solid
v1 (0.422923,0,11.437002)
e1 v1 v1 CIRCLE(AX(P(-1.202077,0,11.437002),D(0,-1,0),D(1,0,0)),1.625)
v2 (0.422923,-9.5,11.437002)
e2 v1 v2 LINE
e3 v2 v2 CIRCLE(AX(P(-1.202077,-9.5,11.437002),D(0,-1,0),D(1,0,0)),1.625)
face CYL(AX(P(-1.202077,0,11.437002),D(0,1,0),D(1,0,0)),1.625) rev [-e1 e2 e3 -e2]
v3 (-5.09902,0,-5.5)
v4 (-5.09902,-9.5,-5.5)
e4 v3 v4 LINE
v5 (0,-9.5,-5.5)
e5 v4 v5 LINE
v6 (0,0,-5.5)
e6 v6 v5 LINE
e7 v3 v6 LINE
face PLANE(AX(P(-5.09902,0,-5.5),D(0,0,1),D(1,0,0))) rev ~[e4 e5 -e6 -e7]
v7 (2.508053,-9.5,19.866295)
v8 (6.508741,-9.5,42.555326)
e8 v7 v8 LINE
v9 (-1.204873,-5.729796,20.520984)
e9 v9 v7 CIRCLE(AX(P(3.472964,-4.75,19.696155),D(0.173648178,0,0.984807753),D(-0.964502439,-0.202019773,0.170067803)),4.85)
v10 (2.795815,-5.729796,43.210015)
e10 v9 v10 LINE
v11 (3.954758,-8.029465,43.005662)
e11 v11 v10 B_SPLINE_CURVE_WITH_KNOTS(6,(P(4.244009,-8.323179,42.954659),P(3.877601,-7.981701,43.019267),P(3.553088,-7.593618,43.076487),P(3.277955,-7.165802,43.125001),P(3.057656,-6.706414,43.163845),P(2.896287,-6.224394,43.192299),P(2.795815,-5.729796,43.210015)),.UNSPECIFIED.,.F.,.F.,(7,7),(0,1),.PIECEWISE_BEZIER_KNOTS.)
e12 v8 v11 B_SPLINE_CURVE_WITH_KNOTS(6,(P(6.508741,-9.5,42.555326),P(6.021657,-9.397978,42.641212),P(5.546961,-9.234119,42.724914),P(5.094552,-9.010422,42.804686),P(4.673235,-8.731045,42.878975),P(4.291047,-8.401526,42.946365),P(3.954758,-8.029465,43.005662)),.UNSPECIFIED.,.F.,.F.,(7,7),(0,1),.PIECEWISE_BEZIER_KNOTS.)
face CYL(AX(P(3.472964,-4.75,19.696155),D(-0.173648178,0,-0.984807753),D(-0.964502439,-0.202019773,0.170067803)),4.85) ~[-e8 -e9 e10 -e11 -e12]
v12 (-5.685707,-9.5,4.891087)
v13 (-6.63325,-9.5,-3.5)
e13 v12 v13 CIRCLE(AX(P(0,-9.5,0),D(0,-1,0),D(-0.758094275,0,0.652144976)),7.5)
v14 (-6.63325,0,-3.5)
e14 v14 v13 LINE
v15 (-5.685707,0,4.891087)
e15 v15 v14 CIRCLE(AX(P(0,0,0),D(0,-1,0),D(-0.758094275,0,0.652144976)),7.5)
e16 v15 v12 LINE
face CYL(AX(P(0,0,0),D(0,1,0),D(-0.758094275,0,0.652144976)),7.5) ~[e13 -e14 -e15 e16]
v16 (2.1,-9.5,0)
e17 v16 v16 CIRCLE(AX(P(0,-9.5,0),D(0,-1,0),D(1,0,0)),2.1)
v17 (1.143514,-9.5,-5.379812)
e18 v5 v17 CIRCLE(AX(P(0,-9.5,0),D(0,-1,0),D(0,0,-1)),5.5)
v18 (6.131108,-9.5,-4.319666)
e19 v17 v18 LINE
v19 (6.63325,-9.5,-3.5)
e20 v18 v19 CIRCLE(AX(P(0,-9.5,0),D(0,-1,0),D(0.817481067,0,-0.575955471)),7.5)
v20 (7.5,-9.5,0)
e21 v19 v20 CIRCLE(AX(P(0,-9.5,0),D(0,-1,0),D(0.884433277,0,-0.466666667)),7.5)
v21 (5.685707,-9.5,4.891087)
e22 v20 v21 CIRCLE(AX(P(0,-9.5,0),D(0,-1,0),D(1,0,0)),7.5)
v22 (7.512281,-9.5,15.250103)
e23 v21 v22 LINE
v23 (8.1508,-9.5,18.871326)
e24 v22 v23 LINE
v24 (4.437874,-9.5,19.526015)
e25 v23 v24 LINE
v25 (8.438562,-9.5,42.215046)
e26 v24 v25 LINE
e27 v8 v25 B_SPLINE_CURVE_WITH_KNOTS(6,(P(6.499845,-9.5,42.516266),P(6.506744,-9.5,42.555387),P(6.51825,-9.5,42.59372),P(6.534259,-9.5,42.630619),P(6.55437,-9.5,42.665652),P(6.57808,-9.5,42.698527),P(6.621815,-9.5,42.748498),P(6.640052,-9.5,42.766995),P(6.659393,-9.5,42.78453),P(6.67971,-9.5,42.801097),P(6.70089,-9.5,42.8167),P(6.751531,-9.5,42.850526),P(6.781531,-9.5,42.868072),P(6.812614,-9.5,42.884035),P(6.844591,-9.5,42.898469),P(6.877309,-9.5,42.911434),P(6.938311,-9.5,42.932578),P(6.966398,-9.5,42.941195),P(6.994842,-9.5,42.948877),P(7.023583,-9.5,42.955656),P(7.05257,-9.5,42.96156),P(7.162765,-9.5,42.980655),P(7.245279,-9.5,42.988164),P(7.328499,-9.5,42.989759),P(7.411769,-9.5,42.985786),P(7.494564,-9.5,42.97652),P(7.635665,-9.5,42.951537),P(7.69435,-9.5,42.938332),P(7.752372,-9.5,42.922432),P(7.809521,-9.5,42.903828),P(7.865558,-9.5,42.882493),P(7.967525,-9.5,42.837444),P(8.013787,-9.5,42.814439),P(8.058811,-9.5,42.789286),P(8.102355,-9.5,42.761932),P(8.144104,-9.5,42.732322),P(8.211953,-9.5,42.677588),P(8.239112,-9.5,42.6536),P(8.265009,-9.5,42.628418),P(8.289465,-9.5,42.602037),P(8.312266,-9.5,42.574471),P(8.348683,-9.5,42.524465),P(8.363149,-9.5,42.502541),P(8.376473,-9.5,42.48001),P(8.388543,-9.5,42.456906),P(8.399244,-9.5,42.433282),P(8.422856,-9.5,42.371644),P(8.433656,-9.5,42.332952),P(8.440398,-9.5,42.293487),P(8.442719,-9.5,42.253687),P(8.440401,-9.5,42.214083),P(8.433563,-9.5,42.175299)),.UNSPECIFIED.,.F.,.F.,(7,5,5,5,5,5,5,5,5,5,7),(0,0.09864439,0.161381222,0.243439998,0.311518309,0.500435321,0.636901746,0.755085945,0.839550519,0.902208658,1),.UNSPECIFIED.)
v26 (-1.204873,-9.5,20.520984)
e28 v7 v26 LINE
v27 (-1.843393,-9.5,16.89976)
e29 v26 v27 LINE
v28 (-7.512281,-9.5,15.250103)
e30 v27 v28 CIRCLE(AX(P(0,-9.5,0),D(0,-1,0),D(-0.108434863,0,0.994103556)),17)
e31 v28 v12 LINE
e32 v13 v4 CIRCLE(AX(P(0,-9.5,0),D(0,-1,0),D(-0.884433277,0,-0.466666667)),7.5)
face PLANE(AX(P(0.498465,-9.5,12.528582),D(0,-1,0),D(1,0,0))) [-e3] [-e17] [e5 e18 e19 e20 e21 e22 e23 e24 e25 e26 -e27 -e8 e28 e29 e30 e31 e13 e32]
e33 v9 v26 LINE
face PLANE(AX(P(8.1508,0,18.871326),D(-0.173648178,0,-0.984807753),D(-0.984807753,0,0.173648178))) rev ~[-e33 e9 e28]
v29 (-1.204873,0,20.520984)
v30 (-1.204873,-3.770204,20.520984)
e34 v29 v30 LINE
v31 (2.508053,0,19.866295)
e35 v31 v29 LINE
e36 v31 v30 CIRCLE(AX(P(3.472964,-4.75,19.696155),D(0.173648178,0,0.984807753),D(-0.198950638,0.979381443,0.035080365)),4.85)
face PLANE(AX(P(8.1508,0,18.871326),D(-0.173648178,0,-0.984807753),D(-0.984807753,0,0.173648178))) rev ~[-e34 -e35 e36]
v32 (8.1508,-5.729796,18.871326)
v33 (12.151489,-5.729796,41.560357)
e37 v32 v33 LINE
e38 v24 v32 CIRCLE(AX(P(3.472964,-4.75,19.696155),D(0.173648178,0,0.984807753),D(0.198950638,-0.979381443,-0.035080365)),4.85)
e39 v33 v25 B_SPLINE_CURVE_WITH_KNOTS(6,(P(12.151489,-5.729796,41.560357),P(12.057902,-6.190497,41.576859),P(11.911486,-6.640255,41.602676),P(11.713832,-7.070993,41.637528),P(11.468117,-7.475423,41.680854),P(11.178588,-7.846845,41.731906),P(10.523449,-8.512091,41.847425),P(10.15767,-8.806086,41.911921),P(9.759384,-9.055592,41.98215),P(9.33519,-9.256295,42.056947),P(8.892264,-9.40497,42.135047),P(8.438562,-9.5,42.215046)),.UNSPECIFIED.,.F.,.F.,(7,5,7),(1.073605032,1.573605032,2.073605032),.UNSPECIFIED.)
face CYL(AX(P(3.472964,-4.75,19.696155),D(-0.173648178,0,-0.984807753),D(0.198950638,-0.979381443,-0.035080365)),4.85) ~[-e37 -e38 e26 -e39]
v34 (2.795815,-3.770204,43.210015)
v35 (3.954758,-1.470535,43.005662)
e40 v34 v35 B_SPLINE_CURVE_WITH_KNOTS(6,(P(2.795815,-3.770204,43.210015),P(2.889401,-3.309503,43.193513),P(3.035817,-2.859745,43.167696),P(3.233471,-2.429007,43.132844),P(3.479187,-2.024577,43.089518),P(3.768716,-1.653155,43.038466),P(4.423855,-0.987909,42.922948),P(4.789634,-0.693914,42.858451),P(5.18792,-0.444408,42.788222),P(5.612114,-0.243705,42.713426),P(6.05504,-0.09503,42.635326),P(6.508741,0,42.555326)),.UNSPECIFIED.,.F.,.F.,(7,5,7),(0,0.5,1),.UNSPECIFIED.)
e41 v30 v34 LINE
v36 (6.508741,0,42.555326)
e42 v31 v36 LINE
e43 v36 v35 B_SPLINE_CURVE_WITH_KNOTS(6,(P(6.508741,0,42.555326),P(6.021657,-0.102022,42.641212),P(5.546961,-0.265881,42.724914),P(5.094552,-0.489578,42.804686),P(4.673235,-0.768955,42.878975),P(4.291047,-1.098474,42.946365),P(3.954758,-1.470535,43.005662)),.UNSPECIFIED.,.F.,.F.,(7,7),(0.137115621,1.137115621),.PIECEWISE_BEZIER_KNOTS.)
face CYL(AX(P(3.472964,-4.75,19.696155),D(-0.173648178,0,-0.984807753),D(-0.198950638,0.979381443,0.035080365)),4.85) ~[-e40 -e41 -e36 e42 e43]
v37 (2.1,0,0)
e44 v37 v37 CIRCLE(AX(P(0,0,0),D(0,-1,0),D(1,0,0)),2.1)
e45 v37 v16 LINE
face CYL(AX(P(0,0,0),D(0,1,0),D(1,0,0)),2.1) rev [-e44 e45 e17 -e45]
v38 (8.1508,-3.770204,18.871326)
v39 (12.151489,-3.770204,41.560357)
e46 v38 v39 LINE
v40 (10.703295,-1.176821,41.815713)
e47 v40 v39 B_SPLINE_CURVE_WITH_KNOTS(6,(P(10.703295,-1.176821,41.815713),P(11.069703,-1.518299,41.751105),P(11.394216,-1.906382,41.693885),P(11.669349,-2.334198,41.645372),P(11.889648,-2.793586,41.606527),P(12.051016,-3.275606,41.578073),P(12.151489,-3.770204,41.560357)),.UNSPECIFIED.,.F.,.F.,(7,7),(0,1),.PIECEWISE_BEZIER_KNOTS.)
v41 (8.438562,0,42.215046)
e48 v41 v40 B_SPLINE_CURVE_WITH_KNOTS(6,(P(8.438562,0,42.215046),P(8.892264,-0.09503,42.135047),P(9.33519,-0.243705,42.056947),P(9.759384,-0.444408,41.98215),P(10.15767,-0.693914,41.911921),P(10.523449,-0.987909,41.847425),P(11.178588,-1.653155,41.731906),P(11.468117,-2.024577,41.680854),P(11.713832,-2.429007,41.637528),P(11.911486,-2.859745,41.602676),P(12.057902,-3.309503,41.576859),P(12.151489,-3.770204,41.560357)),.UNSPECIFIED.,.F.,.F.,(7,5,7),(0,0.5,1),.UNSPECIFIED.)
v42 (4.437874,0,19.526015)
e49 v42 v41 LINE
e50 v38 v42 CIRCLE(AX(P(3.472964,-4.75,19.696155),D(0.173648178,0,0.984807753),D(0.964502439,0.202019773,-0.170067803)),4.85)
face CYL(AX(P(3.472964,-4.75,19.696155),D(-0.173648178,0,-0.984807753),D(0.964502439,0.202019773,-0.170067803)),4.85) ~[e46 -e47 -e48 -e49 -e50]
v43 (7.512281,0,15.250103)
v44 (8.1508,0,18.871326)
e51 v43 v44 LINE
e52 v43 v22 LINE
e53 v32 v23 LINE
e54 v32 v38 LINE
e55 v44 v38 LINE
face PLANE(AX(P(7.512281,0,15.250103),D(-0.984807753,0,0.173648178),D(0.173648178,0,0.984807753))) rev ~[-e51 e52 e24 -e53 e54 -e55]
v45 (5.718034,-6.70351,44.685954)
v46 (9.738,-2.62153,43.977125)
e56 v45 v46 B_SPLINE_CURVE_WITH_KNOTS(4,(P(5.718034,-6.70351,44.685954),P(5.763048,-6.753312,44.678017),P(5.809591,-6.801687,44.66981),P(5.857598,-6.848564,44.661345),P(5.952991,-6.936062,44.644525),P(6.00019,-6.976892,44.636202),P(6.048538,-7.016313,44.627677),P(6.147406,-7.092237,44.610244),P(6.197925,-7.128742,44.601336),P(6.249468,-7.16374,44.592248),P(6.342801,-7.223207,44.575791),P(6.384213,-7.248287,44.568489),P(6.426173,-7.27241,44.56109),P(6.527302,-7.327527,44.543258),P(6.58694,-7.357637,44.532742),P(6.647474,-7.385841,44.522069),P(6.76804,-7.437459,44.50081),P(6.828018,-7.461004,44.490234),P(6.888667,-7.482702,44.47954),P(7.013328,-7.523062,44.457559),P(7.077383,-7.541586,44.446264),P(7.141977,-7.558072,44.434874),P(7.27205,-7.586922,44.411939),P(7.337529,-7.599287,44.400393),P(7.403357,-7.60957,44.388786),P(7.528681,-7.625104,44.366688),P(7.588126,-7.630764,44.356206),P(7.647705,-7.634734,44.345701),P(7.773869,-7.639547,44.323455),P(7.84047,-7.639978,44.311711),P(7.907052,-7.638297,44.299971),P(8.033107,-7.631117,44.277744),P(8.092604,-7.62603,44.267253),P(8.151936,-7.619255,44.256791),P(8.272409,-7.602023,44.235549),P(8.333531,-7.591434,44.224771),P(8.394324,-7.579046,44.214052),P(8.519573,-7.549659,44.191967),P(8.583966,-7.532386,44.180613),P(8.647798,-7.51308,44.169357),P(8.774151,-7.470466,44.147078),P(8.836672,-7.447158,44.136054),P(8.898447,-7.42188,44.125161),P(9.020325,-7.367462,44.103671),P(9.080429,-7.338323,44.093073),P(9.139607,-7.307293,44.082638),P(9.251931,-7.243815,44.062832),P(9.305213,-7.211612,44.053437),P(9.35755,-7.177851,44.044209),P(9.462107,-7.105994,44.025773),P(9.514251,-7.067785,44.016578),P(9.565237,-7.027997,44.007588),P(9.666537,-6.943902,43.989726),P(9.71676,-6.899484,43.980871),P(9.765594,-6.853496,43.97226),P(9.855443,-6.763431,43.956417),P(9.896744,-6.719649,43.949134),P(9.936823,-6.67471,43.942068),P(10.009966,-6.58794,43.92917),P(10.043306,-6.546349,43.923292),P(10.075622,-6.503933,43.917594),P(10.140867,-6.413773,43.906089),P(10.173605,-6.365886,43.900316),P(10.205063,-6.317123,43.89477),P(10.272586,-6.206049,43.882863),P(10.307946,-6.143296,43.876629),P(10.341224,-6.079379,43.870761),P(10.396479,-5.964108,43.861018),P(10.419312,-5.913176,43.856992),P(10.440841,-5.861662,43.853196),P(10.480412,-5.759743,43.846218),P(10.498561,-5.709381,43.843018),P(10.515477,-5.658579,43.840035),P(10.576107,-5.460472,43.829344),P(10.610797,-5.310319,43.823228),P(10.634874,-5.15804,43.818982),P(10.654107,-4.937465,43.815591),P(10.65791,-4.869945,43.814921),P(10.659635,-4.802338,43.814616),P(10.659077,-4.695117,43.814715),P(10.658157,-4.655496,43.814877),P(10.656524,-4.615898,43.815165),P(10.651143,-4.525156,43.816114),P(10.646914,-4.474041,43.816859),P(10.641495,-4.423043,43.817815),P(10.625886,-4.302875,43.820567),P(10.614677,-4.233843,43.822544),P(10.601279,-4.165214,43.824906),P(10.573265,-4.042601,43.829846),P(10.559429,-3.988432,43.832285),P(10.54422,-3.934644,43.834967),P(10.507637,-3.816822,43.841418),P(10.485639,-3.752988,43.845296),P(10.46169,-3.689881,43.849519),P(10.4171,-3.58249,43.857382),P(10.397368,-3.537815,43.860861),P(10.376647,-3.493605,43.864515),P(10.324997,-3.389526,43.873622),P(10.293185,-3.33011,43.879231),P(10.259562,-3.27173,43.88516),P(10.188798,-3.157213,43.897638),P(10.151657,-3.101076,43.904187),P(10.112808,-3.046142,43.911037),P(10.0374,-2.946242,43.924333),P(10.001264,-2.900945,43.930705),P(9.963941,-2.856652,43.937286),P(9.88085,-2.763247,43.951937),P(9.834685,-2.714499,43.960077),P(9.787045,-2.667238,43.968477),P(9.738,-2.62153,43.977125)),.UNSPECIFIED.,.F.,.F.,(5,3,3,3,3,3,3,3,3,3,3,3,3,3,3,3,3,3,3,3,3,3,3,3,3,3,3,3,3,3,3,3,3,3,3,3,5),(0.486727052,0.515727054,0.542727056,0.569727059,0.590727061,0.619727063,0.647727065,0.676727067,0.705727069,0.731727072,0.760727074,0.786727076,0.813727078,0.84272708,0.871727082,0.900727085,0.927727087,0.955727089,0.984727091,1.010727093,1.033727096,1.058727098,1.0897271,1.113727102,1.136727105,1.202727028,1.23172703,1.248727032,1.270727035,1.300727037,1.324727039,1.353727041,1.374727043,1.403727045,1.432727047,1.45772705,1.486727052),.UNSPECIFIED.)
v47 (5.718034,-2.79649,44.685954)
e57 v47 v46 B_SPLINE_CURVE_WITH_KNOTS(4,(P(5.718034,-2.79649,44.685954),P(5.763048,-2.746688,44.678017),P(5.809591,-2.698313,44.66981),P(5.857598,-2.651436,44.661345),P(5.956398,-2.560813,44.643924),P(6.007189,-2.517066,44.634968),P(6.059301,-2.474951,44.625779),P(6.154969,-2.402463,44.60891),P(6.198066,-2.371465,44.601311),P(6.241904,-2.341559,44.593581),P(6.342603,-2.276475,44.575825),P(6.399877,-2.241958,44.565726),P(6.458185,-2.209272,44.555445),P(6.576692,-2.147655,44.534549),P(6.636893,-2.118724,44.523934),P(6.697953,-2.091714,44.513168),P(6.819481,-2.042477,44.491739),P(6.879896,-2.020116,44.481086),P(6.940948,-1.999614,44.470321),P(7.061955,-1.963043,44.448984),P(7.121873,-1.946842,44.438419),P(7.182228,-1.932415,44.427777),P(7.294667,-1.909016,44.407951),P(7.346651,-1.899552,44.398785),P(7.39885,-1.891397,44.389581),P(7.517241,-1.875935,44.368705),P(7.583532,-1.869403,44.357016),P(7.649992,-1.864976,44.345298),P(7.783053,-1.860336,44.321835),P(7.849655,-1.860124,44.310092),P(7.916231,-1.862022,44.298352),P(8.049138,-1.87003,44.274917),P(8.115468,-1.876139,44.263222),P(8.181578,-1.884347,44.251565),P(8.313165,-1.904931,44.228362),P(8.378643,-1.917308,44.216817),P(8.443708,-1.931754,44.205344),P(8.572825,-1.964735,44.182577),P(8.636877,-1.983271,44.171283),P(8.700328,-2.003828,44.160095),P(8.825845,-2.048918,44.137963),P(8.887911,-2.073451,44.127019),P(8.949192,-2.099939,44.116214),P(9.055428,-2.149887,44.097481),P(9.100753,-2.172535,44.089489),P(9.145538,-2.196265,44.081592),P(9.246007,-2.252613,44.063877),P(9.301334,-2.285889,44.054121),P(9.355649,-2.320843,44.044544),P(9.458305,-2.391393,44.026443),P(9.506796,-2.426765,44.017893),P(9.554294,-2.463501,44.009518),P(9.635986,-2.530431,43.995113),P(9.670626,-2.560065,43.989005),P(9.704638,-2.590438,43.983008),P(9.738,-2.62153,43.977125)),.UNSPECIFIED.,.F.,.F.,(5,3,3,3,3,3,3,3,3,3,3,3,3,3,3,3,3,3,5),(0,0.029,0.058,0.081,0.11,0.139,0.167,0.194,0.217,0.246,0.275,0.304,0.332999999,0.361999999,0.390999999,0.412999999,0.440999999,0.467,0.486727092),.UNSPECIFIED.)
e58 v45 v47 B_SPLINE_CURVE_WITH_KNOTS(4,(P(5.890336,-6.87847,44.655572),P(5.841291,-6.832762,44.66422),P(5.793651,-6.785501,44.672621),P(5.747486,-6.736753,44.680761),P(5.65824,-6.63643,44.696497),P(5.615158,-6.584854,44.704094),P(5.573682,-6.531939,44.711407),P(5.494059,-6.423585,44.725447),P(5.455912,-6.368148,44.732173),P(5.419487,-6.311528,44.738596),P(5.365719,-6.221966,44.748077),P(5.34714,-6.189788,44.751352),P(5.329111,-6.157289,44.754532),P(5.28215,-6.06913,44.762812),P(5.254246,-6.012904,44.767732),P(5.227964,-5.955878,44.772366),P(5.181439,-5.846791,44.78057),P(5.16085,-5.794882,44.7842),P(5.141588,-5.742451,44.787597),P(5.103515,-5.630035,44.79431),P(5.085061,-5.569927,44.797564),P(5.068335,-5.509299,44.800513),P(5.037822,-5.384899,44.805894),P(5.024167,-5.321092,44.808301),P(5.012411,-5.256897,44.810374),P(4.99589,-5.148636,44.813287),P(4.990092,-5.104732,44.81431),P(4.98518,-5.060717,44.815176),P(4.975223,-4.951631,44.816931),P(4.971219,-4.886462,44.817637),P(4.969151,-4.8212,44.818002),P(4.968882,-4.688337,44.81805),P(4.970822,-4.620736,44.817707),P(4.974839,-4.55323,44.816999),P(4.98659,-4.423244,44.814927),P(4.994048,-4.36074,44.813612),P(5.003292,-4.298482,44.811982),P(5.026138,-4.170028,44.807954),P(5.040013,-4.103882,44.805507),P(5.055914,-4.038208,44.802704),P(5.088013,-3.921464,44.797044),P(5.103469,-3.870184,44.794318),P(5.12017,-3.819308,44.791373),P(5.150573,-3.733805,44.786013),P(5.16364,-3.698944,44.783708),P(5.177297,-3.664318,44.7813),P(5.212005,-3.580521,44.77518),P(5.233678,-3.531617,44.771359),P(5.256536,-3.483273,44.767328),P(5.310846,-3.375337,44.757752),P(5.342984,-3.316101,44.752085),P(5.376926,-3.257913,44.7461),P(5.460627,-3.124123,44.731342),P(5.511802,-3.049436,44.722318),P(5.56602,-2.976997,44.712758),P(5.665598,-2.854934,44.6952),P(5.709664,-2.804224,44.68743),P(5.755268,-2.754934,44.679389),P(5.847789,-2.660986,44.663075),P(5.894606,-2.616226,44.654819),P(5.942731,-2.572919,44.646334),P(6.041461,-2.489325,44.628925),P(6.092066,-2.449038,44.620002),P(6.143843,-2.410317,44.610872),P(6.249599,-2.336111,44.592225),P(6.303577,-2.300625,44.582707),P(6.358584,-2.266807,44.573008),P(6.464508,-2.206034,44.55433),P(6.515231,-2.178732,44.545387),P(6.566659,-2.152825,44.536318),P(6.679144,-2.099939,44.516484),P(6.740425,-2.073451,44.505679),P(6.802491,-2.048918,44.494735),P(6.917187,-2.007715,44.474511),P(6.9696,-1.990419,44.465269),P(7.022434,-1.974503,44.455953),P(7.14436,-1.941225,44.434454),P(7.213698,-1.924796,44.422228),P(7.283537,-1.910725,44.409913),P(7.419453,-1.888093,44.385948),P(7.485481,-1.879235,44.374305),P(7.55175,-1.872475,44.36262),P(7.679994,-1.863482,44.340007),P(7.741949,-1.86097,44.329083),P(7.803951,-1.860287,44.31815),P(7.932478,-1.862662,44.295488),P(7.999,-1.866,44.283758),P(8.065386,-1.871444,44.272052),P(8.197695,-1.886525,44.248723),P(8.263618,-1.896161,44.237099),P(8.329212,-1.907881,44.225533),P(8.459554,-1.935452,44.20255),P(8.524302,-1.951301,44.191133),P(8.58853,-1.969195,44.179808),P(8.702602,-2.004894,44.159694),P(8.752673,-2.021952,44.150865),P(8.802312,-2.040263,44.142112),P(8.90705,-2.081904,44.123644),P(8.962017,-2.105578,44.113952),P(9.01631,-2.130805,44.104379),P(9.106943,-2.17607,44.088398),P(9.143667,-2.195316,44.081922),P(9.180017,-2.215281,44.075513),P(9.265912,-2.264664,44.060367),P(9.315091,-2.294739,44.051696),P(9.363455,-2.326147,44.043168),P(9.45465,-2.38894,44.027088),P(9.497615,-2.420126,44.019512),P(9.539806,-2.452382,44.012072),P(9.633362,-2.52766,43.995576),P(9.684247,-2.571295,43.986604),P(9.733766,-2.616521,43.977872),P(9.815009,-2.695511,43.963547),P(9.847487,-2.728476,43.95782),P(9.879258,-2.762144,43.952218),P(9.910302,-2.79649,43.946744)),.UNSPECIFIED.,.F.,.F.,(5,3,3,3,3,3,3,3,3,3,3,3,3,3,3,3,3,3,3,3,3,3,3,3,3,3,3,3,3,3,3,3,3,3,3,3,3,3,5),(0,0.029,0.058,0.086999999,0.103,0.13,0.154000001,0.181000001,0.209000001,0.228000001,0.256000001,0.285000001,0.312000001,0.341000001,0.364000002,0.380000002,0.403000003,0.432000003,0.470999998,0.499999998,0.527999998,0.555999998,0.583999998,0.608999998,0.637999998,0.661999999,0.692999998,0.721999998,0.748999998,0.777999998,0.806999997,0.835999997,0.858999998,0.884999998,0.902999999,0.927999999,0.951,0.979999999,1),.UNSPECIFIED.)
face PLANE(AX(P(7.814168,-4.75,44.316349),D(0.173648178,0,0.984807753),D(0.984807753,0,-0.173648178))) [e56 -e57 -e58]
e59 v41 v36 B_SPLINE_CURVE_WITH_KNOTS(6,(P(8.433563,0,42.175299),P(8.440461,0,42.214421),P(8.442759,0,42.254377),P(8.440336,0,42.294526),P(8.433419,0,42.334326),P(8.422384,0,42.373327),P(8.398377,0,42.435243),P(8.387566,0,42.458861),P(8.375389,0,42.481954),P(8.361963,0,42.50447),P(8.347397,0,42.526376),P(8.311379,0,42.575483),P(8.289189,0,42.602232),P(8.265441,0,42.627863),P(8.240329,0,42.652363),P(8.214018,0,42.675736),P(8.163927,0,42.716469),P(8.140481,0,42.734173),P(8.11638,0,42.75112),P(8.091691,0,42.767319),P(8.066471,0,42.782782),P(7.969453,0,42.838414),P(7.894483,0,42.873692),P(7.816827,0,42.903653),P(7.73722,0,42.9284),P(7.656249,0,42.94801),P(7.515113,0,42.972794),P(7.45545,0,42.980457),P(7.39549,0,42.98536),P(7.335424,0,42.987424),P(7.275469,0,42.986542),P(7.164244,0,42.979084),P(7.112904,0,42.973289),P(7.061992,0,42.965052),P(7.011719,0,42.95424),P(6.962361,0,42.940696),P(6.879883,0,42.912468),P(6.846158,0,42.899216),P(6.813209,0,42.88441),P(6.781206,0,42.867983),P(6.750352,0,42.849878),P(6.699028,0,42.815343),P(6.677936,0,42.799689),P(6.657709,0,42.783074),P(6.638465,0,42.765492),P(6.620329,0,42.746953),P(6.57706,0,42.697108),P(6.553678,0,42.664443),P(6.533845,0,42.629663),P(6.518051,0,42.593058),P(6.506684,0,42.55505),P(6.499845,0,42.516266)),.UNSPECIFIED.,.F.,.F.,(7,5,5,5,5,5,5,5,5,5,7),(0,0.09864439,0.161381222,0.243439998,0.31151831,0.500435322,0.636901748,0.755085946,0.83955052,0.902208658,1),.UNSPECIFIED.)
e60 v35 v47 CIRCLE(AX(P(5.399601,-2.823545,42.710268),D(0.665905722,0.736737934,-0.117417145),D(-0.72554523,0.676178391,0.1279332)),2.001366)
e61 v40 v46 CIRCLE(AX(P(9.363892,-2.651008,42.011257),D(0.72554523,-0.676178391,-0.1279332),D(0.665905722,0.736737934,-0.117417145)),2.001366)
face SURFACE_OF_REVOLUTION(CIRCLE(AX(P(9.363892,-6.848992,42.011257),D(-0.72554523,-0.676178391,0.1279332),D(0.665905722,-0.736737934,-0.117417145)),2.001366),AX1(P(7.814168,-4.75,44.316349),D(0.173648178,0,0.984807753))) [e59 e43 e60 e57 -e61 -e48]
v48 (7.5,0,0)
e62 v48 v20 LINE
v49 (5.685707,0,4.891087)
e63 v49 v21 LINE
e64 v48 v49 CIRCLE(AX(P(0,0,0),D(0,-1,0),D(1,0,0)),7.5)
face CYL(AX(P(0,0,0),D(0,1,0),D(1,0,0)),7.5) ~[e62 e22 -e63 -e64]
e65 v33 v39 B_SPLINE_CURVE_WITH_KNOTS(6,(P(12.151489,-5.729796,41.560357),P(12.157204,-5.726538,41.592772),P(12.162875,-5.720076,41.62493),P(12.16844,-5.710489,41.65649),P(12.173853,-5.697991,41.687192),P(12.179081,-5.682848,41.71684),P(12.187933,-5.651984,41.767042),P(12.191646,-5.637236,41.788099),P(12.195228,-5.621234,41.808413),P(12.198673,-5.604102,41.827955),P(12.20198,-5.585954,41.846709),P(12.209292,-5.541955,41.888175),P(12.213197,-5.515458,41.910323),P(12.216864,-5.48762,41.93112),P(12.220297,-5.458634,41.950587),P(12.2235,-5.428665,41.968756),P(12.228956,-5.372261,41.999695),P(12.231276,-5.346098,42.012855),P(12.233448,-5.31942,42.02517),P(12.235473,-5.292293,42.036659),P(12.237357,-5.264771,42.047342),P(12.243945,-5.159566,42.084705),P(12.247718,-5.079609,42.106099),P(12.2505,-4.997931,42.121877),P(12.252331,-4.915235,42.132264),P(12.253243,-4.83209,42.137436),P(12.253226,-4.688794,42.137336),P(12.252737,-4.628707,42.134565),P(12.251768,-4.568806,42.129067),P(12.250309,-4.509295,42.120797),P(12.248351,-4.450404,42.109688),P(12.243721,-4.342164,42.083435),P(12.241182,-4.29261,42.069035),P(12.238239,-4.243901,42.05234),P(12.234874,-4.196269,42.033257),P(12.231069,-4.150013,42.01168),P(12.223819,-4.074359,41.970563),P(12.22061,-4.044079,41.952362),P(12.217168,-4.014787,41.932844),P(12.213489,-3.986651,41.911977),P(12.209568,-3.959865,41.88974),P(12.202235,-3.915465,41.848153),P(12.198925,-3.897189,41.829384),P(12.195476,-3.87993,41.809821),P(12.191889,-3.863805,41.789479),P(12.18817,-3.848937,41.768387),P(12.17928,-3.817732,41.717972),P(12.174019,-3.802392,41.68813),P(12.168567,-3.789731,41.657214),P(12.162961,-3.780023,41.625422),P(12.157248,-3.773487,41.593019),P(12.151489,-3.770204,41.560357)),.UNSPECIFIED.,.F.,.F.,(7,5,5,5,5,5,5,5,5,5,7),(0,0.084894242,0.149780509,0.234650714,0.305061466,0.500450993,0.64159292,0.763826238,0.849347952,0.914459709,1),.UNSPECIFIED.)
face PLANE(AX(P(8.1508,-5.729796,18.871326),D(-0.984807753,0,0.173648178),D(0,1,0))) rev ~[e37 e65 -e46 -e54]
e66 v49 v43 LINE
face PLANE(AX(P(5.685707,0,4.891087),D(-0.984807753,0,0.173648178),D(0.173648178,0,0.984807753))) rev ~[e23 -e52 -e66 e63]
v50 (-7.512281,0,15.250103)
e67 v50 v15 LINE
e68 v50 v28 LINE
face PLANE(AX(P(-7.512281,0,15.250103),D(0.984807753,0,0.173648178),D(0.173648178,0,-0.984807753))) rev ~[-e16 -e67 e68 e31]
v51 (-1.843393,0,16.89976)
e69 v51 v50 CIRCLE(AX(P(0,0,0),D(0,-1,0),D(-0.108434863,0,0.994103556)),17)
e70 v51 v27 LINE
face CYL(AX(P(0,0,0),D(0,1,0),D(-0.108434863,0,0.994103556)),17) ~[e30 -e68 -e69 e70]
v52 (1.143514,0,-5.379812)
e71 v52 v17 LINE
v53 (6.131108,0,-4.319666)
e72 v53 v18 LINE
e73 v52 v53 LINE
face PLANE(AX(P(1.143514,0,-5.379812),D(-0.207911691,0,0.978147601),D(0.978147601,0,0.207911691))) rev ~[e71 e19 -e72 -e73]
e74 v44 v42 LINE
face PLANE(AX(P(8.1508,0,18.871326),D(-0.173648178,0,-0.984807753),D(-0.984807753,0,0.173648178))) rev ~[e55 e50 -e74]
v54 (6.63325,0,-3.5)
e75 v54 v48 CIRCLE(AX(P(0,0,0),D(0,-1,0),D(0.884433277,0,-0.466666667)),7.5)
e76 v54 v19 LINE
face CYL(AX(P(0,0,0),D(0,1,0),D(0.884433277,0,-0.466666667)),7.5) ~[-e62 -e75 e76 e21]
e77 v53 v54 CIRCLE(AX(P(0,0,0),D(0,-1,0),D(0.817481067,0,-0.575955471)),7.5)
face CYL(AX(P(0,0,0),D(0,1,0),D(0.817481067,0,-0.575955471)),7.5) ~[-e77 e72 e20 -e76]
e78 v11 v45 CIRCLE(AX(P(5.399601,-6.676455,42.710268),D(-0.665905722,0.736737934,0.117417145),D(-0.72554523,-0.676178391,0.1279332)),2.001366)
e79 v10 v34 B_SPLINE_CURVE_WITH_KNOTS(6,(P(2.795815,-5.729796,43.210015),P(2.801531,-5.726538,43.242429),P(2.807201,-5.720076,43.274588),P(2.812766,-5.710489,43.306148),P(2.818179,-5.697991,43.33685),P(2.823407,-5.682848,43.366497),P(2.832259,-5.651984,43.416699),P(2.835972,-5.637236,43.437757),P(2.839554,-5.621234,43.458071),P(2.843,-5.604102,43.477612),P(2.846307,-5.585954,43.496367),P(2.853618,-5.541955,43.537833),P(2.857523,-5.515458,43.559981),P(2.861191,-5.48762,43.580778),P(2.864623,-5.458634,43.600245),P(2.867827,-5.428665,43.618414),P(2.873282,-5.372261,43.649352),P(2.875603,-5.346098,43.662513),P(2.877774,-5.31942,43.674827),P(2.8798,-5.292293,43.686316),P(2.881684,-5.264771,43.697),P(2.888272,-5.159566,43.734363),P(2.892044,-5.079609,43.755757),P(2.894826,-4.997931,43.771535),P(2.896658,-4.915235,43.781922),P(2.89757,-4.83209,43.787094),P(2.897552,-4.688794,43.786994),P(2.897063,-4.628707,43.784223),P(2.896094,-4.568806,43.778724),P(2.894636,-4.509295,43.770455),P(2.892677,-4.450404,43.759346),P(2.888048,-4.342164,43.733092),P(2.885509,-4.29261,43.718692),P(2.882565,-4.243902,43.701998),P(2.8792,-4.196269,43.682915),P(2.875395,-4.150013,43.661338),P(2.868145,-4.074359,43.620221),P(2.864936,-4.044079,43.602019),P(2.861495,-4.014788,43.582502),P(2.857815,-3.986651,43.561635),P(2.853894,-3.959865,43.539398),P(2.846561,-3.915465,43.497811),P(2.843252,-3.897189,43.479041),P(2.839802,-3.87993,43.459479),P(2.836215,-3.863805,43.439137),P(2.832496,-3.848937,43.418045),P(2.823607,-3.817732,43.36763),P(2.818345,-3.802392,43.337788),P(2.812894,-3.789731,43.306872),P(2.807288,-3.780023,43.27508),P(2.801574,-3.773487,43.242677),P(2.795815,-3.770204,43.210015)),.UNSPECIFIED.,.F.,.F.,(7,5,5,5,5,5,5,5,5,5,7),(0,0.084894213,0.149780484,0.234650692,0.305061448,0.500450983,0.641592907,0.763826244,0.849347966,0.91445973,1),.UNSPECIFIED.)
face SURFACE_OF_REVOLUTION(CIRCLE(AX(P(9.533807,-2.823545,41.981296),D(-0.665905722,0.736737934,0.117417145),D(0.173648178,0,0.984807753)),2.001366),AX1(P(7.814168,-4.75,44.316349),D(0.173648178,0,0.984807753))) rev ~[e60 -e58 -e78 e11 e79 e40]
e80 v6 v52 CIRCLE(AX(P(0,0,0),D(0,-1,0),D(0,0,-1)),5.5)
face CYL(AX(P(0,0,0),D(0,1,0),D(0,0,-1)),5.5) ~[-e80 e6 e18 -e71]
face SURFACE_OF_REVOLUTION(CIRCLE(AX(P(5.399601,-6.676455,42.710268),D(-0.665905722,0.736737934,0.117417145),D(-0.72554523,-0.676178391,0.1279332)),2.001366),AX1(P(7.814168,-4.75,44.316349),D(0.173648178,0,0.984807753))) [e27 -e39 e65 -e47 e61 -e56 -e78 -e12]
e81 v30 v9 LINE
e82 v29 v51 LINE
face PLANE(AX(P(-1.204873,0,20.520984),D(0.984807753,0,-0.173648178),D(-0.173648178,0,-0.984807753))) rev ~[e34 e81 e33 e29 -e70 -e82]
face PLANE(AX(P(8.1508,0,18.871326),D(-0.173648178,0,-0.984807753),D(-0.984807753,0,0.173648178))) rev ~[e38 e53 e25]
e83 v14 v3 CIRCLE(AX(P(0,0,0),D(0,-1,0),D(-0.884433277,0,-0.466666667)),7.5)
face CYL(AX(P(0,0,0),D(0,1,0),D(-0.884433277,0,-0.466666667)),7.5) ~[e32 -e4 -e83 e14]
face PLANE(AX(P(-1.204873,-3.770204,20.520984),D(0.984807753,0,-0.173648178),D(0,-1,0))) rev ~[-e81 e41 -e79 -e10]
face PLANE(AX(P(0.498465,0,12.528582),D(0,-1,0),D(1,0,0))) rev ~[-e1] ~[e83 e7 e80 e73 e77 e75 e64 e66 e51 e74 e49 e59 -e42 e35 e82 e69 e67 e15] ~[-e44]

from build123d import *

# Parameters (mm, degrees)
F0_R        = 1.625
F0_R_2      = 2.1
F1_DEPTH    = 9.5
F3_DEPTH    = 25
F4_T2_ANGLE = 184.9085480034
F4_T4_ANGLE = 184.9085480034
F4_T6_ANGLE = 184.9085480034
F4_T8_ANGLE = 184.9085480034


# Not quite as in the source:
# - a fillet or chamfer that OpenCascade refuses, or shapes differently, is made with other operations: its cross-section is extruded or revolved along the edge and cut away or added
# - a feature names something its author has since deleted; it is built from what else it names


with BuildPart() as f1:
    # F0 (on Front) → F1 (new body)
    with BuildSketch(Plane.XZ):
        with BuildLine():
            Line((-7.512280983, 15.2501027679), (-5.6857070658, 4.891087319))
            ThreePointArc((-5.6857070658, 4.891087319), (0, 7.5), (5.6857070658, 4.891087319))
            Line((5.6857070658, 4.891087319), (7.512280983, 15.2501027679))
            Line((7.512280983, 15.2501027679), (8.1508003801, 18.8713262163))
            Line((8.1508003801, 18.8713262163), (-1.2048732735, 20.5209839042))
            Line((-1.2048732735, 20.5209839042), (-1.8433926706, 16.8997604558))
            ThreePointArc((-1.8433926706, 16.8997604558), (-4.75, 16.3229133429), (-7.512280983, 15.2501027679))
        make_face()
        with Locations((-1.2020773276, 11.4370017967)):
            Circle(F0_R, mode=Mode.SUBTRACT)
        with BuildLine():
            ThreePointArc((-5.6857070658, 4.891087319), (-7.452634421, 0.8415700723), (-6.6332495807, -3.5))
            Line((-6.6332495807, -3.5), (6.6332495807, -3.5))
            ThreePointArc((6.6332495807, -3.5), (7.2800883187, -1.8028627436), (7.5, 0))
            ThreePointArc((7.5, 0), (7.0318135283, 2.6083708523), (5.6857070658, 4.891087319))
            ThreePointArc((5.6857070658, 4.891087319), (0, 7.5), (-5.6857070658, 4.891087319))
        make_face()
        Circle(F0_R_2, mode=Mode.SUBTRACT)
        with BuildLine():
            ThreePointArc((-6.6332495807, -3.5), (-5.9507591554, -4.5649168092), (-5.0990195136, -5.5))
            Line((-5.0990195136, -5.5), (0, -5.5))
            ThreePointArc((0, -5.5), (0.574906548, -5.4698704245), (1.1435142995, -5.379811804))
            Line((1.1435142995, -5.379811804), (6.1311080028, -4.3196660355))
            ThreePointArc((6.1311080028, -4.3196660355), (6.3953240131, -3.9178860075), (6.6332495807, -3.5))
            Line((6.6332495807, -3.5), (-6.6332495807, -3.5))
        make_face()
    extrude(amount=F1_DEPTH)

    # F2 (on face) → F3 (join)
    with BuildSketch(Plane(origin=(3.4729635533, 0, 19.6961550602), x_dir=(0.984807753, 0, -0.1736481777), z_dir=(0.1736481777, 0, 0.984807753))):
        with BuildLine():
            Line((4.75, -5.7297958971), (4.75, -3.7702041029))
            ThreePointArc((4.75, -3.7702041029), (3.4294678888, -1.3205321112), (0.9797958971, 0))
            Line((0.9797958971, 0), (-0.9797958971, 0))
            ThreePointArc((-0.9797958971, 0), (-3.4294678888, -1.3205321112), (-4.75, -3.7702041029))
            Line((-4.75, -3.7702041029), (-4.75, -5.7297958971))
            ThreePointArc((-4.75, -5.7297958971), (-3.4294678888, -8.1794678888), (-0.9797958971, -9.5))
            Line((-0.9797958971, -9.5), (0.9797958971, -9.5))
            ThreePointArc((0.9797958971, -9.5), (3.4294678888, -8.1794678888), (4.75, -5.7297958971))
        make_face()
    extrude(amount=F3_DEPTH)

    # F4: fillet of radius 2 on 4 edges, made by hand

    # F4_s1 → F4_t2 (revolve, cut)
    with BuildSketch(Plane(origin=(2.3303405276, -2.5782182234, -0.4109019093), x_dir=(-0.7418696826, -0.6705440881, 0), z_dir=(-0.6659057216, 0.7367379343, 0.1174171453))):
        with BuildLine():
            ThreePointArc((2.4557468395, 43.6793554426), (1.6921353384, 45.0072275442), (0.2132331001, 45.4062200412))
            Line((0.2132331001, 45.4062200412), (0.187450643, 45.6046889581))
            ThreePointArc((0.187450643, 45.6046889581), (1.1796484238, 45.7331788115), (2.1717946748, 45.8620653318))
            Line((2.1717946748, 45.8620653318), (2.3960460488, 45.6893788719))
            ThreePointArc((2.3960460488, 45.6893788719), (2.5249325691, 44.6972326209), (2.6542157564, 43.7051378996))
            Line((2.6542157564, 43.7051378996), (2.4557468395, 43.6793554426))
        make_face()
    revolve(axis=Axis((7.814167995, -4.75, 44.3163488855), (0.1736481777, 0, 0.984807753)), revolution_arc=F4_T2_ANGLE, mode=Mode.SUBTRACT)

    # F4_s3 → F4_t4 (revolve, cut)
    with BuildSketch(Plane(origin=(-2.3303405276, -2.1717817766, 0.4109019093), x_dir=(0.6817807283, -0.731556586, 0), z_dir=(-0.7255452297, -0.6761783908, 0.1279331997))):
        with BuildLine():
            ThreePointArc((13.3818366305, 41.7080845524), (12.9673157833, 43.1827096947), (11.6314878435, 43.9323166305))
            Line((11.6314878435, 43.9323166305), (11.655182008, 44.1310456738))
            ThreePointArc((11.655182008, 44.1310456738), (12.6485812749, 44.0122013421), (13.6420278977, 43.8937541973))
            Line((13.6420278977, 43.8937541973), (13.8170627765, 43.6713309895))
            ThreePointArc((13.8170627765, 43.6713309895), (13.6986156317, 42.6778843667), (13.5805656738, 41.6843903878))
            Line((13.5805656738, 41.6843903878), (13.3818366305, 41.7080845524))
        make_face()
    revolve(axis=Axis((7.814167995, -4.75, 44.3163488855), (0.1736481777, 0, 0.984807753)), revolution_arc=F4_T4_ANGLE, mode=Mode.SUBTRACT)

    # F4_s5 → F4_t6 (revolve, cut)
    with BuildSketch(Plane(origin=(2.3303405276, -2.5782182234, -0.4109019093), x_dir=(0.7418696826, 0.6705440881, 0), z_dir=(0.6659057216, -0.7367379343, -0.1174171453))):
        with BuildLine():
            ThreePointArc((5.4373559827, 44.6721702336), (6.7652280844, 43.9085587325), (7.1642205814, 42.4296564942))
            Line((7.1642205814, 42.4296564942), (7.3626894983, 42.4038740371))
            ThreePointArc((7.3626894983, 42.4038740371), (7.4911793516, 43.3960718179), (7.6200658719, 44.3882180689))
            Line((7.6200658719, 44.3882180689), (7.4473794121, 44.6124694429))
            ThreePointArc((7.4473794121, 44.6124694429), (6.455233161, 44.7413559632), (5.4631384397, 44.8706391505))
            Line((5.4631384397, 44.8706391505), (5.4373559827, 44.6721702336))
        make_face()
    revolve(axis=Axis((7.814167995, -4.75, 44.3163488855), (0.1736481777, 0, 0.984807753)), revolution_arc=F4_T6_ANGLE, mode=Mode.SUBTRACT)

    # F4_s7 → F4_t8 (revolve, cut)
    with BuildSketch(Plane(origin=(-2.3303405276, -2.1717817766, 0.4109019093), x_dir=(-0.6817807283, 0.731556586, 0), z_dir=(0.7255452297, 0.6761783908, -0.1279331997))):
        with BuildLine():
            ThreePointArc((-5.9734927288, 44.6069108674), (-4.4988675865, 44.1923900202), (-3.7492606507, 42.8565620804))
            Line((-3.7492606507, 42.8565620804), (-3.5505316074, 42.880256245))
            ThreePointArc((-3.5505316074, 42.880256245), (-3.669375939, 43.8736555118), (-3.7878230838, 44.8671021347))
            Line((-3.7878230838, 44.8671021347), (-4.0102462916, 45.0421370134))
            ThreePointArc((-4.0102462916, 45.0421370134), (-5.0036929145, 44.9236898686), (-5.9971868933, 44.8056399107))
            Line((-5.9971868933, 44.8056399107), (-5.9734927288, 44.6069108674))
        make_face()
    revolve(axis=Axis((7.814167995, -4.75, 44.3163488855), (0.1736481777, 0, 0.984807753)), revolution_arc=F4_T8_ANGLE, mode=Mode.SUBTRACT)


solid = f1.part
